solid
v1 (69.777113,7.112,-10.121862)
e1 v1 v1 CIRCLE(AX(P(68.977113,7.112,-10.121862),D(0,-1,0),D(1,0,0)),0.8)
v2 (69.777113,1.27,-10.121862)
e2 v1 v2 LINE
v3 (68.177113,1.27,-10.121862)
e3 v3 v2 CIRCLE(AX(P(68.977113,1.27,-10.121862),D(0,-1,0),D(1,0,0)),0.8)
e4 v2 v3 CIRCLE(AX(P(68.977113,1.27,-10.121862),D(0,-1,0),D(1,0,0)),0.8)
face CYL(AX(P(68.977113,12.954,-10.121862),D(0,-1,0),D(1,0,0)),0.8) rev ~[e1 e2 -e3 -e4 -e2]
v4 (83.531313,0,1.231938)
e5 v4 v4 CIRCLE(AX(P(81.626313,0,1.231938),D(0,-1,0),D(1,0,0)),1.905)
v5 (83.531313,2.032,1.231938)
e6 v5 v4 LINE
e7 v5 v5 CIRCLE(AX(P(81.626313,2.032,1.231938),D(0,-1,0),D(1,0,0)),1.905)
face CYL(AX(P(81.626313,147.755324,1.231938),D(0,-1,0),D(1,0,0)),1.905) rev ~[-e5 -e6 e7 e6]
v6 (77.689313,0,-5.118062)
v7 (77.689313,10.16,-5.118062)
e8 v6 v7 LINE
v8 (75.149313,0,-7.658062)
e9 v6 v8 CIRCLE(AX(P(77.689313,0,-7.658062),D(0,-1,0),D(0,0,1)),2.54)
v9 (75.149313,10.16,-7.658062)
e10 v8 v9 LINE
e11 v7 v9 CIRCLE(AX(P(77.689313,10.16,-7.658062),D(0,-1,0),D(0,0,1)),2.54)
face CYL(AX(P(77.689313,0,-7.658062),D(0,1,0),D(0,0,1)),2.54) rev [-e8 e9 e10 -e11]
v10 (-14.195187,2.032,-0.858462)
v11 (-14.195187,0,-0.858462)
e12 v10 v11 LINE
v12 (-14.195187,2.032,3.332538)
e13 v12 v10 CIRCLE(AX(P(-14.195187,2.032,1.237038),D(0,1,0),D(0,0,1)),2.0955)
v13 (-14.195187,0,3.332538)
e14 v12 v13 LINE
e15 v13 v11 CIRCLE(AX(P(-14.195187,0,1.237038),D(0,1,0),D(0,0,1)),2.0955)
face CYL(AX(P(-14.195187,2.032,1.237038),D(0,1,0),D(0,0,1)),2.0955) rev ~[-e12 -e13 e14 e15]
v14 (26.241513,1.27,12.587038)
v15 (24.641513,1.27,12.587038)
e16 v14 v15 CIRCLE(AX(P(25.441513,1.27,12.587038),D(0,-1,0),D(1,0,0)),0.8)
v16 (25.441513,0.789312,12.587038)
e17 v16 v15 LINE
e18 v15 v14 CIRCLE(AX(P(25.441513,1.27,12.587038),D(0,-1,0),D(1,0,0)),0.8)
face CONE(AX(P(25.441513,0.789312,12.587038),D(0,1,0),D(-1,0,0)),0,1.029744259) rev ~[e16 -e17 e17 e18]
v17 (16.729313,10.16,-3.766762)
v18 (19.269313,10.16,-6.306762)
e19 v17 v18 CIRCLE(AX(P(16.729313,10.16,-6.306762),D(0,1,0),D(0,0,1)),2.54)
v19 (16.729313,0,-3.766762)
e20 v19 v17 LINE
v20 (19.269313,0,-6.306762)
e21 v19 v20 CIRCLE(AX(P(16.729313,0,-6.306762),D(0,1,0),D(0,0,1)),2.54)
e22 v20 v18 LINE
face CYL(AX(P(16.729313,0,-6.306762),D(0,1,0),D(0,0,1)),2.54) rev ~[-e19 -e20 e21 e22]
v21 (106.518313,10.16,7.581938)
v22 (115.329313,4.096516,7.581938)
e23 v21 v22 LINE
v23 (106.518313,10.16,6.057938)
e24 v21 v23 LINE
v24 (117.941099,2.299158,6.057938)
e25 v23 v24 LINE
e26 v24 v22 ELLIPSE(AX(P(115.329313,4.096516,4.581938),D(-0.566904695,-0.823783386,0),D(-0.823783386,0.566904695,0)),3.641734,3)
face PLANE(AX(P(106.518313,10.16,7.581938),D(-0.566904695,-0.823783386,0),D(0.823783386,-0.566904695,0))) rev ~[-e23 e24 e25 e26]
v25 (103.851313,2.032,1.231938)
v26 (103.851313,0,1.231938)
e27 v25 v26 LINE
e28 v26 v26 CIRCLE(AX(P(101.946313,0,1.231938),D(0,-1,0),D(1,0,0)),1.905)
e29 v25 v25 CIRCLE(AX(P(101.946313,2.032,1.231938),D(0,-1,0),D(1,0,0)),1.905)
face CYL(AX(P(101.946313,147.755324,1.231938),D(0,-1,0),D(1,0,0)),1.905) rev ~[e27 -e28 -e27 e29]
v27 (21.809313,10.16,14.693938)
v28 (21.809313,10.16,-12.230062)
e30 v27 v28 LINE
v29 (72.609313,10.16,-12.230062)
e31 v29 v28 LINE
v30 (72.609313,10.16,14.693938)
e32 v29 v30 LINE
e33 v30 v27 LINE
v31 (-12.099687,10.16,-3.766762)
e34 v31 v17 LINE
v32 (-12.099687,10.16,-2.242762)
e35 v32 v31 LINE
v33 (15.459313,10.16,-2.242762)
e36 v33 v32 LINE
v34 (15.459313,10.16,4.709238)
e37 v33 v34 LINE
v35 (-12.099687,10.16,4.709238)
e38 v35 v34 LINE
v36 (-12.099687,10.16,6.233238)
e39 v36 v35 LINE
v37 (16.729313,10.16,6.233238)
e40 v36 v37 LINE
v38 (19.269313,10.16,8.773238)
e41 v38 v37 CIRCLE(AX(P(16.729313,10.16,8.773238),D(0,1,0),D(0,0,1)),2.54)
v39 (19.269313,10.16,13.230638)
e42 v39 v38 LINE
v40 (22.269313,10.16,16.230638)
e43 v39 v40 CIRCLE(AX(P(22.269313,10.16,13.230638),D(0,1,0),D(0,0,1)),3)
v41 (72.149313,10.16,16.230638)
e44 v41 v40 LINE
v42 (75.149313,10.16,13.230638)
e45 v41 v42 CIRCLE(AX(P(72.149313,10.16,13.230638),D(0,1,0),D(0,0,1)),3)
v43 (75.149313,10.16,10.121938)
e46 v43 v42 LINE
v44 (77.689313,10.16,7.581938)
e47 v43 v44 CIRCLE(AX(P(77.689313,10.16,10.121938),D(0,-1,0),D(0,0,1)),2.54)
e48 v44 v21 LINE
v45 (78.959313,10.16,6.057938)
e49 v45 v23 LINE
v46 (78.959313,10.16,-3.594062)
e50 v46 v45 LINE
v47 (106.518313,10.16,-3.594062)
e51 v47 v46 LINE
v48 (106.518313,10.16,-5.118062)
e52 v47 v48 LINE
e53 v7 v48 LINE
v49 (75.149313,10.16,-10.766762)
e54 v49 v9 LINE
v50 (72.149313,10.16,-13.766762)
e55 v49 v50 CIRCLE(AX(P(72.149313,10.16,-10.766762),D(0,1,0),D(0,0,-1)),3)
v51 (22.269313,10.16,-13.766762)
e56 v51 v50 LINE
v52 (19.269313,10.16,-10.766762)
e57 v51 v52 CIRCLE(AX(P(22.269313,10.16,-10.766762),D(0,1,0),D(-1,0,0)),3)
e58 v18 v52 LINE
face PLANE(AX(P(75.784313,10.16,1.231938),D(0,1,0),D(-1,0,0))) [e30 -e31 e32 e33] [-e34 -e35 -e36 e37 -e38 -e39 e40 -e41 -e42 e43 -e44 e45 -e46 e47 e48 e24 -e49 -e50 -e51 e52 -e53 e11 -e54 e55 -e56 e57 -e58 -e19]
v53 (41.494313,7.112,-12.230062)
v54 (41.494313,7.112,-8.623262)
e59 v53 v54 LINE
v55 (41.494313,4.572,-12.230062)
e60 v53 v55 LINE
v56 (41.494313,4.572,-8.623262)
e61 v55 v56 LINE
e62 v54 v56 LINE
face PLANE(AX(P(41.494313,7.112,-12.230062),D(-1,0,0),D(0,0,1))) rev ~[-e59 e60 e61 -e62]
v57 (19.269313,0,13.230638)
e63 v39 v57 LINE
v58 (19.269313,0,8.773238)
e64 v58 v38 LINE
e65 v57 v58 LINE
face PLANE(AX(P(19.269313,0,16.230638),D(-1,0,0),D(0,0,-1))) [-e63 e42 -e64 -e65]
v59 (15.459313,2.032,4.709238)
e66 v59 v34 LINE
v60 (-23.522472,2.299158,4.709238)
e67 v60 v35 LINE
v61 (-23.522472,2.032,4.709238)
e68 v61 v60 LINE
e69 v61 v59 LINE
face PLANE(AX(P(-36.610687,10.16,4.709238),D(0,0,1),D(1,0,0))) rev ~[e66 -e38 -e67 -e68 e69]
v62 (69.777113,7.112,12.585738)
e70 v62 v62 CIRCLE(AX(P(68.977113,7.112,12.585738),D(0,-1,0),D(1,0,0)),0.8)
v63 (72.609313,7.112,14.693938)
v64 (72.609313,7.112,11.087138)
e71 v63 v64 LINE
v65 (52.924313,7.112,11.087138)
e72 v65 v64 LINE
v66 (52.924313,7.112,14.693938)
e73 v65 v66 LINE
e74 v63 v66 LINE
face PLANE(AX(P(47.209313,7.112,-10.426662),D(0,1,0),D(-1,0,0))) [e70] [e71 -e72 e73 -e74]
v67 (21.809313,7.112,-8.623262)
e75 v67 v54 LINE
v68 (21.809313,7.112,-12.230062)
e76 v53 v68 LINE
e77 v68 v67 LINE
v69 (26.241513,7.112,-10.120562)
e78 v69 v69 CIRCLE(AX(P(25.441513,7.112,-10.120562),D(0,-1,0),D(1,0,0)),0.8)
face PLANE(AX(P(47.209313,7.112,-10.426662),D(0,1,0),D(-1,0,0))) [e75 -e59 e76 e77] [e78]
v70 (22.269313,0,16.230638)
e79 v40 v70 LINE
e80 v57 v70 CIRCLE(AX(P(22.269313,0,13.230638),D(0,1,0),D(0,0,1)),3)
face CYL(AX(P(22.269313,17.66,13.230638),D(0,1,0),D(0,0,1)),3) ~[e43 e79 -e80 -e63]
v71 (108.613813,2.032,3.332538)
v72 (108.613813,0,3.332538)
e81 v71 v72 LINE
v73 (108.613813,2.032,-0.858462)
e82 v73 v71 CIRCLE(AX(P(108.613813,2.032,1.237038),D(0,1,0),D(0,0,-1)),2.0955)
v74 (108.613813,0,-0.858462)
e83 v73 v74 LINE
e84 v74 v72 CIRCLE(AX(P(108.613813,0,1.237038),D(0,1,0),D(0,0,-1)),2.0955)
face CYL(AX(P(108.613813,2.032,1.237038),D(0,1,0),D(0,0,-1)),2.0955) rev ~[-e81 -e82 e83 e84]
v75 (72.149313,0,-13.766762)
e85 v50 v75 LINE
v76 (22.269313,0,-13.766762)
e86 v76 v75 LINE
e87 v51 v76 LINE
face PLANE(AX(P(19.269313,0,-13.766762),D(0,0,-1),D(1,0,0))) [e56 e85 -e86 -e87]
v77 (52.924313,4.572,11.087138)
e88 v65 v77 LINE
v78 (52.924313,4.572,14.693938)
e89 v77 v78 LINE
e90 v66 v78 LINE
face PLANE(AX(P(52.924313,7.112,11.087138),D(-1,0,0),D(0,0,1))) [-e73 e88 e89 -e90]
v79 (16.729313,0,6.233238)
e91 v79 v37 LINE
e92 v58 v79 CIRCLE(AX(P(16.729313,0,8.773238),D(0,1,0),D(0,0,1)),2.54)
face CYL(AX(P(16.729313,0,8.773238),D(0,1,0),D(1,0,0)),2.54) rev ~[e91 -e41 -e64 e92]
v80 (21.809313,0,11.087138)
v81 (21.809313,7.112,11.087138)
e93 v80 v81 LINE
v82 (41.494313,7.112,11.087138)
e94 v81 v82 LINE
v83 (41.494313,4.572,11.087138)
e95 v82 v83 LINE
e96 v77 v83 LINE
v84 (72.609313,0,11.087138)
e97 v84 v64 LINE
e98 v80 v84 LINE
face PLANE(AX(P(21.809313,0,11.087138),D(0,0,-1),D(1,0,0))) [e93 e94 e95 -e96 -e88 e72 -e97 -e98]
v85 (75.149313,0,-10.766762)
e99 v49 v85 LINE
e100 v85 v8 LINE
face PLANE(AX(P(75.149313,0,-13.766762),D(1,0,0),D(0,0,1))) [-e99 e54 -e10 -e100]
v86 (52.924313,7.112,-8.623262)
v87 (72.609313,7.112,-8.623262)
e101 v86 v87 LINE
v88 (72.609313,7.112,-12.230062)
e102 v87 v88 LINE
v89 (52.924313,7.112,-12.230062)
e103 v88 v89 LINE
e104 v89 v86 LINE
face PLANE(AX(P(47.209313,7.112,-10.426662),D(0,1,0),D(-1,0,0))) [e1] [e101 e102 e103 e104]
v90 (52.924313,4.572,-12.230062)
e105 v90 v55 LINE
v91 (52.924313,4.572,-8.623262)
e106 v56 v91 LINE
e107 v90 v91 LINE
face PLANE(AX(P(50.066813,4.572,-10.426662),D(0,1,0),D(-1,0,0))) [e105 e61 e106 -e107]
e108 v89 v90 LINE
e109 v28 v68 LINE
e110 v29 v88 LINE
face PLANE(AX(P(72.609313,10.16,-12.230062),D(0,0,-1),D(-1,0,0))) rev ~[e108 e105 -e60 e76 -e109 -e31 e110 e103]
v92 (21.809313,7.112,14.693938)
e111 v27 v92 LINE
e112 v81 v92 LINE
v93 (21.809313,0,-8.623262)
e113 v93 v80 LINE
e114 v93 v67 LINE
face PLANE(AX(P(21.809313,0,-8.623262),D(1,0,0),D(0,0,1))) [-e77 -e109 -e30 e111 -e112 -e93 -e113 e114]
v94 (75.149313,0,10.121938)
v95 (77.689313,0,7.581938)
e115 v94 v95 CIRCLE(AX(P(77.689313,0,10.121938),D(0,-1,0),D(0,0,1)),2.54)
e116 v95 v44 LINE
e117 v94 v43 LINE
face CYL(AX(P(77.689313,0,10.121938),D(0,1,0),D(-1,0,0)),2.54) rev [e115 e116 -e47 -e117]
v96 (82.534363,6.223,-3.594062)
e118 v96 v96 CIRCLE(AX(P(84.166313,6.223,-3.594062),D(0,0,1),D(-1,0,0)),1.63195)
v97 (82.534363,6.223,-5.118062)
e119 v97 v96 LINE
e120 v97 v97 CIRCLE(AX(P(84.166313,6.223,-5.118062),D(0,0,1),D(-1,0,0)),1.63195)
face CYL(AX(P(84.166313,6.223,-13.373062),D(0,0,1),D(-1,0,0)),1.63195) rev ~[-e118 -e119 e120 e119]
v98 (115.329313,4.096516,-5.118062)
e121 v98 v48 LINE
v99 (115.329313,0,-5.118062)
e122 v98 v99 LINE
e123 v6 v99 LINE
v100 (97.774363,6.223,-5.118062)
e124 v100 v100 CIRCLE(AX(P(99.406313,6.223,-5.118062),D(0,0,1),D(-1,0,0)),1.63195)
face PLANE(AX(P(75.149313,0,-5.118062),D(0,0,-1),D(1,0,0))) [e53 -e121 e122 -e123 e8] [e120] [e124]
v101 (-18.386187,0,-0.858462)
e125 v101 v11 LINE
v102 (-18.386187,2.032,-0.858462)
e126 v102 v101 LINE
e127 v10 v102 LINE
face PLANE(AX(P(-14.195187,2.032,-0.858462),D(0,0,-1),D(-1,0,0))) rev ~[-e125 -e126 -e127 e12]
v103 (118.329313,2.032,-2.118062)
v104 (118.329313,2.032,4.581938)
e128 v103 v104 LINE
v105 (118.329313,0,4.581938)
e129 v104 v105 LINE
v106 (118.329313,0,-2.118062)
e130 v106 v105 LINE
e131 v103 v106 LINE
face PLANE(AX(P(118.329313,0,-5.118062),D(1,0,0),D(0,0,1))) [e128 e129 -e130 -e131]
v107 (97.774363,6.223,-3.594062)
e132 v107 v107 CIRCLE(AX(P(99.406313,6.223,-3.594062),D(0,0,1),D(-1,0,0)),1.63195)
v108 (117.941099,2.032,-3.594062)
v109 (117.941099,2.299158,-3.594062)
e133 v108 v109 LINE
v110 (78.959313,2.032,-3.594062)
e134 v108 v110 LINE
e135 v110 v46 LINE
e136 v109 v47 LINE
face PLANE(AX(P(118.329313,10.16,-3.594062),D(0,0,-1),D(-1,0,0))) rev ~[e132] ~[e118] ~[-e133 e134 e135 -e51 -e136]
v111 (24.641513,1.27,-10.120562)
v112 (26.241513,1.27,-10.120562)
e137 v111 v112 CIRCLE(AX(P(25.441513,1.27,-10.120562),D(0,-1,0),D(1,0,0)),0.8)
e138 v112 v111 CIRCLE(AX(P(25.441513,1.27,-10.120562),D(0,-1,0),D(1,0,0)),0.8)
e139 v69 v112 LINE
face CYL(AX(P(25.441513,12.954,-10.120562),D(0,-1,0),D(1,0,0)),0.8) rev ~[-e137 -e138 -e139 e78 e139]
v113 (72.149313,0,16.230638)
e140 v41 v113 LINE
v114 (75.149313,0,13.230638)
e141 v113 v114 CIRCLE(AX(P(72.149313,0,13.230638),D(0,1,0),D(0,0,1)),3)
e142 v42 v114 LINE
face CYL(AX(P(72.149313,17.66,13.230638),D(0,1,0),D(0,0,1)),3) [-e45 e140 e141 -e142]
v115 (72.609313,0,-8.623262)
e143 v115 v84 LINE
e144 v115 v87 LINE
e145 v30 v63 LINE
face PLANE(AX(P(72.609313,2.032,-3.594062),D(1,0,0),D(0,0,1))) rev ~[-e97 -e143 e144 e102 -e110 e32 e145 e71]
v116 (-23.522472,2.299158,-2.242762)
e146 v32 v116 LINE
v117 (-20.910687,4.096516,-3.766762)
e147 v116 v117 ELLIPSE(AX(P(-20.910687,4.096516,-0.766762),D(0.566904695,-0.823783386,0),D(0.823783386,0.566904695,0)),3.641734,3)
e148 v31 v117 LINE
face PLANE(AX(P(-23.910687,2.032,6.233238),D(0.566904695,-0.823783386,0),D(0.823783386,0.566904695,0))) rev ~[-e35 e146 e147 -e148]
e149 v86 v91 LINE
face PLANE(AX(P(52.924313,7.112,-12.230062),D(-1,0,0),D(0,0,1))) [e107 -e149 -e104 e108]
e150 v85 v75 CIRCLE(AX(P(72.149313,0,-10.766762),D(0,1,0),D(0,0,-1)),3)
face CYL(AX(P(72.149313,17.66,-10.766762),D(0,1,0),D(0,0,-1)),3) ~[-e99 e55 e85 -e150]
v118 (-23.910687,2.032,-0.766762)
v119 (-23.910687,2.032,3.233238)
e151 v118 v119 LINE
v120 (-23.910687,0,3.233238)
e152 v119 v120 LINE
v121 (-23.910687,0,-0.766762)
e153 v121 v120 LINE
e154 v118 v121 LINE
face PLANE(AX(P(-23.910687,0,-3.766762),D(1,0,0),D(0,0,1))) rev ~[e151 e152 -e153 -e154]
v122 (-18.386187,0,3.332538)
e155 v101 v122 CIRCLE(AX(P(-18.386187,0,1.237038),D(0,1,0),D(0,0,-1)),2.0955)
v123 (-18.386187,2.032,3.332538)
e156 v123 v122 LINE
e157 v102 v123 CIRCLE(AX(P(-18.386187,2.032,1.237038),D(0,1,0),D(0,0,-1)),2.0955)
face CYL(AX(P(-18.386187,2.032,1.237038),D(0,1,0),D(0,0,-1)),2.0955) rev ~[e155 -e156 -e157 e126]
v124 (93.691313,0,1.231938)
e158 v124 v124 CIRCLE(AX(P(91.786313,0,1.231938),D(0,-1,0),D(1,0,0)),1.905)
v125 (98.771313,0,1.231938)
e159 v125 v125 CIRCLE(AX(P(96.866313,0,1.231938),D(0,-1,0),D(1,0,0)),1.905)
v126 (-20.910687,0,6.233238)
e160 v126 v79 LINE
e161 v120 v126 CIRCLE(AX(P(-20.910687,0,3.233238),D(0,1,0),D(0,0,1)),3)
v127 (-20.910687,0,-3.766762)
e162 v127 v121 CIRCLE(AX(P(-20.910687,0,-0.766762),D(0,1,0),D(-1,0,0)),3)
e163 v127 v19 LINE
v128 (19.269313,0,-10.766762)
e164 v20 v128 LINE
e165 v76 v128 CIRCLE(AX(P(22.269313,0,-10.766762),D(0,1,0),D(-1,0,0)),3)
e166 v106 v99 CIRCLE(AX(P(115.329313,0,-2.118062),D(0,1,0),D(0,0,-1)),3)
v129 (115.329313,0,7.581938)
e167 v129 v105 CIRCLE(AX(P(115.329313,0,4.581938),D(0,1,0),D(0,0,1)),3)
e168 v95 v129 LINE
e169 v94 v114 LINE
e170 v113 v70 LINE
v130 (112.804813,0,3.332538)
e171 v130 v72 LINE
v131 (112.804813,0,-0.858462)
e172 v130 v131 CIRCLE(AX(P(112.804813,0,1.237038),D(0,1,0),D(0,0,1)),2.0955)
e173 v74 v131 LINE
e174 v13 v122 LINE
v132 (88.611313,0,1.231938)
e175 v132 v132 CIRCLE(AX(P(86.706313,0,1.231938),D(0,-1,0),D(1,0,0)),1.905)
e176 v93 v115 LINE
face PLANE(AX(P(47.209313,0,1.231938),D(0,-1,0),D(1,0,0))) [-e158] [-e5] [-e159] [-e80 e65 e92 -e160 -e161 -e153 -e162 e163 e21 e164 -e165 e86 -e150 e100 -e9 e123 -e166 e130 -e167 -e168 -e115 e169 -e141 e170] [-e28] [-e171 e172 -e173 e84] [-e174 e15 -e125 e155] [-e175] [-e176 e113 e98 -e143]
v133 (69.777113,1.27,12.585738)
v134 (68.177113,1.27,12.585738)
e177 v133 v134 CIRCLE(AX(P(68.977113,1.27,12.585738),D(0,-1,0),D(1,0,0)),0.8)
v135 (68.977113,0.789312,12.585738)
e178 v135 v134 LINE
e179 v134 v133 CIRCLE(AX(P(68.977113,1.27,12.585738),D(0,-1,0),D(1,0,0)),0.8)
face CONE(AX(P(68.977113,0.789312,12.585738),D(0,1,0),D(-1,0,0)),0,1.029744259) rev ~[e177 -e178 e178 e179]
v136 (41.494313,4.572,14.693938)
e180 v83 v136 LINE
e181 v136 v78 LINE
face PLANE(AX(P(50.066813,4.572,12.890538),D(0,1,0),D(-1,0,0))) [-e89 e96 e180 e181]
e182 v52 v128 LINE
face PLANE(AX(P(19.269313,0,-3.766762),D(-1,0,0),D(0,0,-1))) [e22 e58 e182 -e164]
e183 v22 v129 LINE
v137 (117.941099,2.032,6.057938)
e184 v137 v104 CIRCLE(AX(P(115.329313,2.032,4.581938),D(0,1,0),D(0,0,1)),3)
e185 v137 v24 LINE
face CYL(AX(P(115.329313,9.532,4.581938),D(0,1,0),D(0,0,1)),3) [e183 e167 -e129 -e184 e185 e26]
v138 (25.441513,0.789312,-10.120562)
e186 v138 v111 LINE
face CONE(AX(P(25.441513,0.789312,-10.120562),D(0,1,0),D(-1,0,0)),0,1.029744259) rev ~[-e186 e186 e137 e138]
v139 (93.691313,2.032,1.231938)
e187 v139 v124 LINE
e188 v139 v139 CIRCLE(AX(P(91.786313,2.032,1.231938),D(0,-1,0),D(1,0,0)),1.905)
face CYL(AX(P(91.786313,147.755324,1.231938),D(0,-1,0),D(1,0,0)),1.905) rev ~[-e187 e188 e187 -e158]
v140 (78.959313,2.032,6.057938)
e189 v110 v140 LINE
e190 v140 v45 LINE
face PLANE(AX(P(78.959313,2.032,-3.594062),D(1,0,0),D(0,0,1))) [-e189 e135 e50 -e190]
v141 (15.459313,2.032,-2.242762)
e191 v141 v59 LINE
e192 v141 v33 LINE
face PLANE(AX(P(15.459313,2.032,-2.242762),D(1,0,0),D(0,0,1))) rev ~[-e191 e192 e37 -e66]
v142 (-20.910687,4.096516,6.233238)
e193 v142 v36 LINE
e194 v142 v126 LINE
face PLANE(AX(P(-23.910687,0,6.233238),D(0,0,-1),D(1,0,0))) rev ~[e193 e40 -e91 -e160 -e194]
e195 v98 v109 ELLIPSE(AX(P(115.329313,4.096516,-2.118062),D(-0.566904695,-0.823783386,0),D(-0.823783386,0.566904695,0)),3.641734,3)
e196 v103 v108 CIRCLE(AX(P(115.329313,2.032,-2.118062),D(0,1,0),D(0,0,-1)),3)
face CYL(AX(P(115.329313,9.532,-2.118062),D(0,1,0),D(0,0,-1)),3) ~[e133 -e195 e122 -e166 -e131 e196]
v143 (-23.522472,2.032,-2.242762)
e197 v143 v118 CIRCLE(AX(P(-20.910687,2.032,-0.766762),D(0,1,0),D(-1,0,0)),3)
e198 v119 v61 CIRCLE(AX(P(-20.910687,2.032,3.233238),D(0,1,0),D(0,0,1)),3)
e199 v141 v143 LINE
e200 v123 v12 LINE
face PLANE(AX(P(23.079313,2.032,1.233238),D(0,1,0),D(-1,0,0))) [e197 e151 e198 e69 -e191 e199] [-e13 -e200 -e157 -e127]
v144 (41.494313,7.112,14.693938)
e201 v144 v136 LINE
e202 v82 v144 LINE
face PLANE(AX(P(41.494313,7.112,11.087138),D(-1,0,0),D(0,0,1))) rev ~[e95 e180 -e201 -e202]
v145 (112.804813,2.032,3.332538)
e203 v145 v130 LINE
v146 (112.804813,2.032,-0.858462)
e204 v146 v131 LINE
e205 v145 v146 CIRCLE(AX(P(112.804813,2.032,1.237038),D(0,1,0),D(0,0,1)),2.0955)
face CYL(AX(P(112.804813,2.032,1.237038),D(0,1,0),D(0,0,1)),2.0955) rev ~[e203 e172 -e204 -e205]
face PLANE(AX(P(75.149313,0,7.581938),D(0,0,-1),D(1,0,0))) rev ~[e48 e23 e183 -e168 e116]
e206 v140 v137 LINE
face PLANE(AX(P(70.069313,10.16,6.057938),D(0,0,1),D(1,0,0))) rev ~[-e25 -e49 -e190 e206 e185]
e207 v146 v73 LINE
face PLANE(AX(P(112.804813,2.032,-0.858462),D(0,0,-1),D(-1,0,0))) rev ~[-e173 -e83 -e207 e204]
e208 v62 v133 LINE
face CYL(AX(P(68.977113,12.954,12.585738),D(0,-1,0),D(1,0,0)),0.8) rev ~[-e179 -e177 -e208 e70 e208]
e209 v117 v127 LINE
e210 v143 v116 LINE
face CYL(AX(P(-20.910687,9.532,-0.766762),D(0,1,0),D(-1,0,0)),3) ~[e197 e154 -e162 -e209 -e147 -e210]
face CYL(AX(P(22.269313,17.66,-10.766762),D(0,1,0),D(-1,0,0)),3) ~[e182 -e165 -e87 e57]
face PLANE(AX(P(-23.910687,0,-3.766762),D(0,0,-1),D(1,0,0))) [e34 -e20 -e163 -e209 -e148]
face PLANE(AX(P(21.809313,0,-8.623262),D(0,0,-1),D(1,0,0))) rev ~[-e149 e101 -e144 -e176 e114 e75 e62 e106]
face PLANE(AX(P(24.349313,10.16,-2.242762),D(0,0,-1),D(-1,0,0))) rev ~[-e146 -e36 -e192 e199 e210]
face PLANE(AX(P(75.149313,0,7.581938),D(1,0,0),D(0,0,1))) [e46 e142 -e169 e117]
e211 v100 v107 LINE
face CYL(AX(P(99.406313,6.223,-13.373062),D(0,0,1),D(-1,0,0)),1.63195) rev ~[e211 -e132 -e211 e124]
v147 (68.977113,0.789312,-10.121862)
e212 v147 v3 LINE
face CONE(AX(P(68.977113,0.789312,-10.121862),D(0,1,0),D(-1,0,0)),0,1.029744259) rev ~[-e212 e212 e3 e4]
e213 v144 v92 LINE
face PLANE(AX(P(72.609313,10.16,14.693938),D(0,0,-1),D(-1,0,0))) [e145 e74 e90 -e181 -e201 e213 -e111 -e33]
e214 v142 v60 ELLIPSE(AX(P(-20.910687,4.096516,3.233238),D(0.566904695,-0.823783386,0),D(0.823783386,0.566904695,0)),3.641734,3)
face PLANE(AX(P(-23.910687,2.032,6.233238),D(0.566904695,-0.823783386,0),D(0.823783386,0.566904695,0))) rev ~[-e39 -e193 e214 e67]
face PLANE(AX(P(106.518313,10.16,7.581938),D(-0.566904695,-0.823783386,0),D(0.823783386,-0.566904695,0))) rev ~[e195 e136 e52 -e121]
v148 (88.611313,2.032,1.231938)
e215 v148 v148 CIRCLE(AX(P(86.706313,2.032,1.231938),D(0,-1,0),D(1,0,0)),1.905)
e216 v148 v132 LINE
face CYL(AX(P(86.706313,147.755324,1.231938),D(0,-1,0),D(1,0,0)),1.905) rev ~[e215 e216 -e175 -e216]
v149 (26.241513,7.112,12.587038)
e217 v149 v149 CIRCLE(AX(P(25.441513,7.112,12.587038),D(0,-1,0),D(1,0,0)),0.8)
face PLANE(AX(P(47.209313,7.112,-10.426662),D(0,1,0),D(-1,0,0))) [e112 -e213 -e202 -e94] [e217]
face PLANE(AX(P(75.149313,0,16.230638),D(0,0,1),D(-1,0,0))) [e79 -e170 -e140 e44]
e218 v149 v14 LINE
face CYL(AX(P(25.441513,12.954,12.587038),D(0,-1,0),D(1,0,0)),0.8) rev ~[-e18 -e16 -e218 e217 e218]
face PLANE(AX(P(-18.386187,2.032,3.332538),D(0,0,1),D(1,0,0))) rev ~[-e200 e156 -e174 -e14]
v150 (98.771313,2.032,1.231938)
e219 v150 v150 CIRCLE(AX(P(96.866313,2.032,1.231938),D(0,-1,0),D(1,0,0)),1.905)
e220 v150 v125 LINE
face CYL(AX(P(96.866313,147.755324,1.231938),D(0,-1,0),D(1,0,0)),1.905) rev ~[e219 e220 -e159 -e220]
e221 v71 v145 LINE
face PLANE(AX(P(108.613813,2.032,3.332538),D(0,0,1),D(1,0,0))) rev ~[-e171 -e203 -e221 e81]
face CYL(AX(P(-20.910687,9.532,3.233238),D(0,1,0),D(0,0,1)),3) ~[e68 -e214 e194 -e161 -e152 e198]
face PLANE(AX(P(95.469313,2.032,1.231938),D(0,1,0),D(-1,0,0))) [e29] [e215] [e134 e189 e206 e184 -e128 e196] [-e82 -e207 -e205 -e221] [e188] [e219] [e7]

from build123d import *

# Parameters (mm, degrees)
F0_W         = 50.8
F0_H         = 19.7104
F0_W_2       = 43.18
F0_H_2       = 10
F0_H_3       = 12.7
F1_DEPTH     = 10.16
F2_W         = 50.8
F2_H         = 3.6068
F2_H_2       = 19.7104
F3_DEPTH     = 3.048
F4_W         = 45.72
F4_H         = 9.652
F4_W_2       = 2.54
F4_H_2       = 6.952
F4_W_3       = 12.7
F5_DEPTH     = 8.128
F8_DEPTH     = 25
F10_T1_DEPTH = 25.16
F10_T3_DEPTH = 17.032
F12_D        = 1.6
F12_DEPTH    = 5.842
F12_TIP      = 0.4806884952
F13_W        = 5.715
F13_H        = 3.6068
F14_DEPTH    = 2.54
F15_W        = 5.715
F15_H        = 3.6068
F16_DEPTH    = 2.54
F17_DEPTH    = 25.4
F18_R        = 2.54
F20_D        = 3.81
F21_W        = 6.35
F21_H        = 9.652
F22_W        = 6.35
F22_H        = 6.952
F23_DEPTH    = 8.128
F25_D        = 3.2639
F25_DEPTH    = 8.255
F25_TIP      = 0.9805744872


# Not quite as in the source:
# - a fillet or chamfer that OpenCascade refuses, or shapes differently, is made with other operations: its cross-section is extruded or revolved along the edge and cut away or added


with BuildPart() as f1:
    # F0 (on Front) → F1 (new body)
    with BuildSketch(Plane.XZ):
        Polygon((75.1493134361, 16.2306381539), (19.2693134361, 16.2306381539), (19.2693134361, 6.2332381539), (19.2693134361, -3.7667618461), (19.2693134361, -13.7667618461), (75.1493134361, -13.7667618461), (75.1493134361, -5.1180618461), (75.1493134361, 7.5819381539), align=None)
        with Locations((47.2093134361, 1.2319381539)):
            Rectangle(F0_W, F0_H, mode=Mode.SUBTRACT)
        with Locations((-2.3206865639, 1.2332381539)):
            Rectangle(F0_W_2, F0_H_2)
        with Locations((96.7393134361, 1.2319381539)):
            Rectangle(F0_W_2, F0_H_3)
    extrude(amount=-F1_DEPTH)

    # F2 (on face) → F3 (cut)
    with BuildSketch(Plane(origin=(0, 10.16, 0), x_dir=(-1, 0, 0), z_dir=(0, 1, 0))):
        with Locations((-47.2093134361, -10.4266618461)):
            Rectangle(F2_W, F2_H)
        with Locations((-47.2093134361, 1.2319381539)):
            Rectangle(F2_W, F2_H_2)
        with Locations((-47.2093134361, 12.8905381539)):
            Rectangle(F2_W, F2_H)
    extrude(amount=-F3_DEPTH, mode=Mode.SUBTRACT)

    # F4 (on face) → F5 (cut)
    with BuildSketch(Plane(origin=(0, 10.16, 0), x_dir=(-1, 0, 0), z_dir=(0, 1, 0))):
        with Locations((-95.4693134361, 1.2319381539)):
            Rectangle(F4_W, F4_H)
        with Locations((-71.3393134361, 1.2319381539)):
            Rectangle(F4_W_2, F4_H)
        with Locations((-23.0793134361, 1.2332381539)):
            Rectangle(F4_W_2, F4_H_2)
        with Locations((1.0506865639, 1.2332381539)):
            Rectangle(F4_W, F4_H_2)
        with Locations((30.2606865639, 1.2332381539)):
            Rectangle(F4_W_3, F4_H_2)
    extrude(amount=-F5_DEPTH, mode=Mode.SUBTRACT)

    # F7 (on face) + F6 (on face) → F8 (cut)
    with BuildSketch(Plane.XY.offset(6.2332381539)):
        Polygon((-23.9106865639, 10.16), (-23.9106865639, 2.032), (-12.0996865639, 10.16), align=None)
    with BuildSketch(Plane.XY.offset(7.5819381539)):
        Polygon((118.3293134361, 10.16), (106.5183134361, 10.16), (118.3293134361, 2.032), align=None)
    extrude(amount=-F8_DEPTH, mode=Mode.SUBTRACT)

    # F10: fillet of radius 3 on 8 edges, made by hand

    # F10_s2 → F10_t1 (cut)
    with BuildSketch(Plane.XZ.offset(-17.66)):
        with BuildLine():
            ThreePointArc((72.1493134361, -13.7667618461), (74.2706337797, -12.8880821896), (75.1493134361, -10.7667618461))
            Line((75.1493134361, -10.7667618461), (75.1493134361, -13.7667618461))
            Line((75.1493134361, -13.7667618461), (72.1493134361, -13.7667618461))
        make_face()
        with BuildLine():
            ThreePointArc((19.2693134361, -10.7667618461), (20.1479930925, -12.8880821896), (22.2693134361, -13.7667618461))
            Line((22.2693134361, -13.7667618461), (19.2693134361, -13.7667618461))
            Line((19.2693134361, -13.7667618461), (19.2693134361, -10.7667618461))
        make_face()
        with BuildLine():
            ThreePointArc((22.2693134361, 16.2306381539), (20.1479930925, 15.3519584975), (19.2693134361, 13.2306381539))
            Line((19.2693134361, 13.2306381539), (19.2693134361, 16.2306381539))
            Line((19.2693134361, 16.2306381539), (22.2693134361, 16.2306381539))
        make_face()
        with BuildLine():
            ThreePointArc((72.1493134361, 16.2306381539), (74.2706337797, 15.3519584975), (75.1493134361, 13.2306381539))
            Line((75.1493134361, 13.2306381539), (75.1493134361, 16.2306381539))
            Line((75.1493134361, 16.2306381539), (72.1493134361, 16.2306381539))
        make_face()
    extrude(amount=F10_T1_DEPTH, mode=Mode.SUBTRACT)

    # F10_s4 → F10_t3 (cut)
    with BuildSketch(Plane.XZ.offset(-9.532)):
        with BuildLine():
            ThreePointArc((-23.9106865639, -0.7667618461), (-23.0320069075, -2.8880821896), (-20.9106865639, -3.7667618461))
            Line((-20.9106865639, -3.7667618461), (-23.9106865639, -3.7667618461))
            Line((-23.9106865639, -3.7667618461), (-23.9106865639, -0.7667618461))
        make_face()
        with BuildLine():
            ThreePointArc((-20.9106865639, 6.2332381539), (-23.0320069075, 5.3545584975), (-23.9106865639, 3.2332381539))
            Line((-23.9106865639, 3.2332381539), (-23.9106865639, 6.2332381539))
            Line((-23.9106865639, 6.2332381539), (-20.9106865639, 6.2332381539))
        make_face()
        with BuildLine():
            ThreePointArc((115.3293134361, -5.1180618461), (117.4506337797, -4.2393821896), (118.3293134361, -2.1180618461))
            Line((118.3293134361, -2.1180618461), (118.3293134361, -5.1180618461))
            Line((118.3293134361, -5.1180618461), (115.3293134361, -5.1180618461))
        make_face()
        with BuildLine():
            ThreePointArc((115.3293134361, 7.5819381539), (117.4506337797, 6.7032584975), (118.3293134361, 4.5819381539))
            Line((118.3293134361, 4.5819381539), (118.3293134361, 7.5819381539))
            Line((118.3293134361, 7.5819381539), (115.3293134361, 7.5819381539))
        make_face()
    extrude(amount=F10_T3_DEPTH, mode=Mode.SUBTRACT)

    # F12
    with Locations(Plane(origin=(0, 7.112, 0), x_dir=(-1, 0, 0), z_dir=(0, 1, 0))):
        with Locations((-68.9771134361, 12.5857381539), (-25.4415134361, 12.5870381539), (-25.4415134361, -10.1205618461), (-68.9771134361, -10.1218618461)):
            Hole(F12_D / 2, depth=F12_DEPTH)
            with Locations((0, 0, -(F12_DEPTH + F12_TIP / 2))):  # 118° drill point
                Cone(0, F12_D / 2, F12_TIP, mode=Mode.SUBTRACT)

    # F13 (on face) → F14 (cut)
    with BuildSketch(Plane(origin=(0, 7.112, 0), x_dir=(-1, 0, 0), z_dir=(0, 1, 0))):
        with Locations((-50.0668134361, 12.8905381539)):
            Rectangle(F13_W, F13_H)
        with Locations((-44.3518134361, 12.8905381539)):
            Rectangle(F13_W, F13_H)
    extrude(amount=-F14_DEPTH, mode=Mode.SUBTRACT)

    # F15 (on face) → F16 (cut)
    with BuildSketch(Plane(origin=(0, 7.112, 0), x_dir=(-1, 0, 0), z_dir=(0, 1, 0))):
        with Locations((-50.0668134361, -10.4266618461)):
            Rectangle(F15_W, F15_H)
        with Locations((-44.3518134361, -10.4266618461)):
            Rectangle(F15_W, F15_H)
    extrude(amount=-F16_DEPTH, mode=Mode.SUBTRACT)

    # F9 (on face) → F17 (cut)
    with BuildSketch(Plane(origin=(0, 2.032, 0), x_dir=(-1, 0, 0), z_dir=(0, 1, 0))):
        with BuildLine():
            Line((-112.8048134361, -0.8584618461), (-108.6138134361, -0.8584618461))
            ThreePointArc((-108.6138134361, -0.8584618461), (-106.5183134361, 1.2370381539), (-108.6138134361, 3.3325381539))
            Line((-108.6138134361, 3.3325381539), (-112.8048134361, 3.3325381539))
            ThreePointArc((-112.8048134361, 3.3325381539), (-114.9003134361, 1.2370381539), (-112.8048134361, -0.8584618461))
        make_face()
        with BuildLine():
            Line((18.3861865639, 3.3325381428), (14.1951865639, 3.3325381428))
            ThreePointArc((14.1951865639, 3.3325381428), (12.0996865639, 1.2370381428), (14.1951865639, -0.8584618572))
            Line((14.1951865639, -0.8584618572), (18.3861865639, -0.8584618572))
            ThreePointArc((18.3861865639, -0.8584618572), (20.4816865639, 1.2370381428), (18.3861865639, 3.3325381428))
        make_face()
    extrude(amount=-F17_DEPTH, mode=Mode.SUBTRACT)

    # F18
    f18_edges = [f1.edges().sort_by_distance(p)[0] for p in [
        (75.149313, 5.08, 7.581938),
        (75.149313, 5.08, -5.118062),
        (19.269313, 5.08, 6.233238),
        (19.269313, 5.08, -3.766762),
    ]]
    fillet(f18_edges, radius=F18_R)

    # F20 (through all)
    with Locations(Plane(origin=(0, 2.032, 0), x_dir=(-1, 0, 0), z_dir=(0, 1, 0))):
        with Locations((-101.9463134361, 1.2319381539), (-91.7863134361, 1.2319381539), (-81.6263134361, 1.2319381539), (-86.7063134361, 1.2319381539), (-96.8663134361, 1.2319381539)):
            Hole(F20_D / 2)

    # F21 (on face) + F22 (on face) → F23 (join)
    with BuildSketch(Plane(origin=(0, 2.032, 0), x_dir=(-1, 0, 0), z_dir=(0, 1, 0))):
        with Locations((-75.7843134361, 1.2319381539)):
            Rectangle(F21_W, F21_H)
    with BuildSketch(Plane(origin=(0, 2.032, 0), x_dir=(-1, 0, 0), z_dir=(0, 1, 0))):
        with Locations((-18.6343134361, 1.2332381539)):
            Rectangle(F22_W, F22_H)
    extrude(amount=F23_DEPTH)

    # F25
    with Locations(Plane(origin=(0, 0, -5.1180618461), x_dir=(1, 0, 0), z_dir=(0, 0, -1))):
        with Locations((84.1663134361, -6.223), (99.4063134361, -6.223)):
            Hole(F25_D / 2, depth=F25_DEPTH)
            with Locations((0, 0, -(F25_DEPTH + F25_TIP / 2))):  # 118° drill point
                Cone(0, F25_D / 2, F25_TIP, mode=Mode.SUBTRACT)


solid = f1.part
